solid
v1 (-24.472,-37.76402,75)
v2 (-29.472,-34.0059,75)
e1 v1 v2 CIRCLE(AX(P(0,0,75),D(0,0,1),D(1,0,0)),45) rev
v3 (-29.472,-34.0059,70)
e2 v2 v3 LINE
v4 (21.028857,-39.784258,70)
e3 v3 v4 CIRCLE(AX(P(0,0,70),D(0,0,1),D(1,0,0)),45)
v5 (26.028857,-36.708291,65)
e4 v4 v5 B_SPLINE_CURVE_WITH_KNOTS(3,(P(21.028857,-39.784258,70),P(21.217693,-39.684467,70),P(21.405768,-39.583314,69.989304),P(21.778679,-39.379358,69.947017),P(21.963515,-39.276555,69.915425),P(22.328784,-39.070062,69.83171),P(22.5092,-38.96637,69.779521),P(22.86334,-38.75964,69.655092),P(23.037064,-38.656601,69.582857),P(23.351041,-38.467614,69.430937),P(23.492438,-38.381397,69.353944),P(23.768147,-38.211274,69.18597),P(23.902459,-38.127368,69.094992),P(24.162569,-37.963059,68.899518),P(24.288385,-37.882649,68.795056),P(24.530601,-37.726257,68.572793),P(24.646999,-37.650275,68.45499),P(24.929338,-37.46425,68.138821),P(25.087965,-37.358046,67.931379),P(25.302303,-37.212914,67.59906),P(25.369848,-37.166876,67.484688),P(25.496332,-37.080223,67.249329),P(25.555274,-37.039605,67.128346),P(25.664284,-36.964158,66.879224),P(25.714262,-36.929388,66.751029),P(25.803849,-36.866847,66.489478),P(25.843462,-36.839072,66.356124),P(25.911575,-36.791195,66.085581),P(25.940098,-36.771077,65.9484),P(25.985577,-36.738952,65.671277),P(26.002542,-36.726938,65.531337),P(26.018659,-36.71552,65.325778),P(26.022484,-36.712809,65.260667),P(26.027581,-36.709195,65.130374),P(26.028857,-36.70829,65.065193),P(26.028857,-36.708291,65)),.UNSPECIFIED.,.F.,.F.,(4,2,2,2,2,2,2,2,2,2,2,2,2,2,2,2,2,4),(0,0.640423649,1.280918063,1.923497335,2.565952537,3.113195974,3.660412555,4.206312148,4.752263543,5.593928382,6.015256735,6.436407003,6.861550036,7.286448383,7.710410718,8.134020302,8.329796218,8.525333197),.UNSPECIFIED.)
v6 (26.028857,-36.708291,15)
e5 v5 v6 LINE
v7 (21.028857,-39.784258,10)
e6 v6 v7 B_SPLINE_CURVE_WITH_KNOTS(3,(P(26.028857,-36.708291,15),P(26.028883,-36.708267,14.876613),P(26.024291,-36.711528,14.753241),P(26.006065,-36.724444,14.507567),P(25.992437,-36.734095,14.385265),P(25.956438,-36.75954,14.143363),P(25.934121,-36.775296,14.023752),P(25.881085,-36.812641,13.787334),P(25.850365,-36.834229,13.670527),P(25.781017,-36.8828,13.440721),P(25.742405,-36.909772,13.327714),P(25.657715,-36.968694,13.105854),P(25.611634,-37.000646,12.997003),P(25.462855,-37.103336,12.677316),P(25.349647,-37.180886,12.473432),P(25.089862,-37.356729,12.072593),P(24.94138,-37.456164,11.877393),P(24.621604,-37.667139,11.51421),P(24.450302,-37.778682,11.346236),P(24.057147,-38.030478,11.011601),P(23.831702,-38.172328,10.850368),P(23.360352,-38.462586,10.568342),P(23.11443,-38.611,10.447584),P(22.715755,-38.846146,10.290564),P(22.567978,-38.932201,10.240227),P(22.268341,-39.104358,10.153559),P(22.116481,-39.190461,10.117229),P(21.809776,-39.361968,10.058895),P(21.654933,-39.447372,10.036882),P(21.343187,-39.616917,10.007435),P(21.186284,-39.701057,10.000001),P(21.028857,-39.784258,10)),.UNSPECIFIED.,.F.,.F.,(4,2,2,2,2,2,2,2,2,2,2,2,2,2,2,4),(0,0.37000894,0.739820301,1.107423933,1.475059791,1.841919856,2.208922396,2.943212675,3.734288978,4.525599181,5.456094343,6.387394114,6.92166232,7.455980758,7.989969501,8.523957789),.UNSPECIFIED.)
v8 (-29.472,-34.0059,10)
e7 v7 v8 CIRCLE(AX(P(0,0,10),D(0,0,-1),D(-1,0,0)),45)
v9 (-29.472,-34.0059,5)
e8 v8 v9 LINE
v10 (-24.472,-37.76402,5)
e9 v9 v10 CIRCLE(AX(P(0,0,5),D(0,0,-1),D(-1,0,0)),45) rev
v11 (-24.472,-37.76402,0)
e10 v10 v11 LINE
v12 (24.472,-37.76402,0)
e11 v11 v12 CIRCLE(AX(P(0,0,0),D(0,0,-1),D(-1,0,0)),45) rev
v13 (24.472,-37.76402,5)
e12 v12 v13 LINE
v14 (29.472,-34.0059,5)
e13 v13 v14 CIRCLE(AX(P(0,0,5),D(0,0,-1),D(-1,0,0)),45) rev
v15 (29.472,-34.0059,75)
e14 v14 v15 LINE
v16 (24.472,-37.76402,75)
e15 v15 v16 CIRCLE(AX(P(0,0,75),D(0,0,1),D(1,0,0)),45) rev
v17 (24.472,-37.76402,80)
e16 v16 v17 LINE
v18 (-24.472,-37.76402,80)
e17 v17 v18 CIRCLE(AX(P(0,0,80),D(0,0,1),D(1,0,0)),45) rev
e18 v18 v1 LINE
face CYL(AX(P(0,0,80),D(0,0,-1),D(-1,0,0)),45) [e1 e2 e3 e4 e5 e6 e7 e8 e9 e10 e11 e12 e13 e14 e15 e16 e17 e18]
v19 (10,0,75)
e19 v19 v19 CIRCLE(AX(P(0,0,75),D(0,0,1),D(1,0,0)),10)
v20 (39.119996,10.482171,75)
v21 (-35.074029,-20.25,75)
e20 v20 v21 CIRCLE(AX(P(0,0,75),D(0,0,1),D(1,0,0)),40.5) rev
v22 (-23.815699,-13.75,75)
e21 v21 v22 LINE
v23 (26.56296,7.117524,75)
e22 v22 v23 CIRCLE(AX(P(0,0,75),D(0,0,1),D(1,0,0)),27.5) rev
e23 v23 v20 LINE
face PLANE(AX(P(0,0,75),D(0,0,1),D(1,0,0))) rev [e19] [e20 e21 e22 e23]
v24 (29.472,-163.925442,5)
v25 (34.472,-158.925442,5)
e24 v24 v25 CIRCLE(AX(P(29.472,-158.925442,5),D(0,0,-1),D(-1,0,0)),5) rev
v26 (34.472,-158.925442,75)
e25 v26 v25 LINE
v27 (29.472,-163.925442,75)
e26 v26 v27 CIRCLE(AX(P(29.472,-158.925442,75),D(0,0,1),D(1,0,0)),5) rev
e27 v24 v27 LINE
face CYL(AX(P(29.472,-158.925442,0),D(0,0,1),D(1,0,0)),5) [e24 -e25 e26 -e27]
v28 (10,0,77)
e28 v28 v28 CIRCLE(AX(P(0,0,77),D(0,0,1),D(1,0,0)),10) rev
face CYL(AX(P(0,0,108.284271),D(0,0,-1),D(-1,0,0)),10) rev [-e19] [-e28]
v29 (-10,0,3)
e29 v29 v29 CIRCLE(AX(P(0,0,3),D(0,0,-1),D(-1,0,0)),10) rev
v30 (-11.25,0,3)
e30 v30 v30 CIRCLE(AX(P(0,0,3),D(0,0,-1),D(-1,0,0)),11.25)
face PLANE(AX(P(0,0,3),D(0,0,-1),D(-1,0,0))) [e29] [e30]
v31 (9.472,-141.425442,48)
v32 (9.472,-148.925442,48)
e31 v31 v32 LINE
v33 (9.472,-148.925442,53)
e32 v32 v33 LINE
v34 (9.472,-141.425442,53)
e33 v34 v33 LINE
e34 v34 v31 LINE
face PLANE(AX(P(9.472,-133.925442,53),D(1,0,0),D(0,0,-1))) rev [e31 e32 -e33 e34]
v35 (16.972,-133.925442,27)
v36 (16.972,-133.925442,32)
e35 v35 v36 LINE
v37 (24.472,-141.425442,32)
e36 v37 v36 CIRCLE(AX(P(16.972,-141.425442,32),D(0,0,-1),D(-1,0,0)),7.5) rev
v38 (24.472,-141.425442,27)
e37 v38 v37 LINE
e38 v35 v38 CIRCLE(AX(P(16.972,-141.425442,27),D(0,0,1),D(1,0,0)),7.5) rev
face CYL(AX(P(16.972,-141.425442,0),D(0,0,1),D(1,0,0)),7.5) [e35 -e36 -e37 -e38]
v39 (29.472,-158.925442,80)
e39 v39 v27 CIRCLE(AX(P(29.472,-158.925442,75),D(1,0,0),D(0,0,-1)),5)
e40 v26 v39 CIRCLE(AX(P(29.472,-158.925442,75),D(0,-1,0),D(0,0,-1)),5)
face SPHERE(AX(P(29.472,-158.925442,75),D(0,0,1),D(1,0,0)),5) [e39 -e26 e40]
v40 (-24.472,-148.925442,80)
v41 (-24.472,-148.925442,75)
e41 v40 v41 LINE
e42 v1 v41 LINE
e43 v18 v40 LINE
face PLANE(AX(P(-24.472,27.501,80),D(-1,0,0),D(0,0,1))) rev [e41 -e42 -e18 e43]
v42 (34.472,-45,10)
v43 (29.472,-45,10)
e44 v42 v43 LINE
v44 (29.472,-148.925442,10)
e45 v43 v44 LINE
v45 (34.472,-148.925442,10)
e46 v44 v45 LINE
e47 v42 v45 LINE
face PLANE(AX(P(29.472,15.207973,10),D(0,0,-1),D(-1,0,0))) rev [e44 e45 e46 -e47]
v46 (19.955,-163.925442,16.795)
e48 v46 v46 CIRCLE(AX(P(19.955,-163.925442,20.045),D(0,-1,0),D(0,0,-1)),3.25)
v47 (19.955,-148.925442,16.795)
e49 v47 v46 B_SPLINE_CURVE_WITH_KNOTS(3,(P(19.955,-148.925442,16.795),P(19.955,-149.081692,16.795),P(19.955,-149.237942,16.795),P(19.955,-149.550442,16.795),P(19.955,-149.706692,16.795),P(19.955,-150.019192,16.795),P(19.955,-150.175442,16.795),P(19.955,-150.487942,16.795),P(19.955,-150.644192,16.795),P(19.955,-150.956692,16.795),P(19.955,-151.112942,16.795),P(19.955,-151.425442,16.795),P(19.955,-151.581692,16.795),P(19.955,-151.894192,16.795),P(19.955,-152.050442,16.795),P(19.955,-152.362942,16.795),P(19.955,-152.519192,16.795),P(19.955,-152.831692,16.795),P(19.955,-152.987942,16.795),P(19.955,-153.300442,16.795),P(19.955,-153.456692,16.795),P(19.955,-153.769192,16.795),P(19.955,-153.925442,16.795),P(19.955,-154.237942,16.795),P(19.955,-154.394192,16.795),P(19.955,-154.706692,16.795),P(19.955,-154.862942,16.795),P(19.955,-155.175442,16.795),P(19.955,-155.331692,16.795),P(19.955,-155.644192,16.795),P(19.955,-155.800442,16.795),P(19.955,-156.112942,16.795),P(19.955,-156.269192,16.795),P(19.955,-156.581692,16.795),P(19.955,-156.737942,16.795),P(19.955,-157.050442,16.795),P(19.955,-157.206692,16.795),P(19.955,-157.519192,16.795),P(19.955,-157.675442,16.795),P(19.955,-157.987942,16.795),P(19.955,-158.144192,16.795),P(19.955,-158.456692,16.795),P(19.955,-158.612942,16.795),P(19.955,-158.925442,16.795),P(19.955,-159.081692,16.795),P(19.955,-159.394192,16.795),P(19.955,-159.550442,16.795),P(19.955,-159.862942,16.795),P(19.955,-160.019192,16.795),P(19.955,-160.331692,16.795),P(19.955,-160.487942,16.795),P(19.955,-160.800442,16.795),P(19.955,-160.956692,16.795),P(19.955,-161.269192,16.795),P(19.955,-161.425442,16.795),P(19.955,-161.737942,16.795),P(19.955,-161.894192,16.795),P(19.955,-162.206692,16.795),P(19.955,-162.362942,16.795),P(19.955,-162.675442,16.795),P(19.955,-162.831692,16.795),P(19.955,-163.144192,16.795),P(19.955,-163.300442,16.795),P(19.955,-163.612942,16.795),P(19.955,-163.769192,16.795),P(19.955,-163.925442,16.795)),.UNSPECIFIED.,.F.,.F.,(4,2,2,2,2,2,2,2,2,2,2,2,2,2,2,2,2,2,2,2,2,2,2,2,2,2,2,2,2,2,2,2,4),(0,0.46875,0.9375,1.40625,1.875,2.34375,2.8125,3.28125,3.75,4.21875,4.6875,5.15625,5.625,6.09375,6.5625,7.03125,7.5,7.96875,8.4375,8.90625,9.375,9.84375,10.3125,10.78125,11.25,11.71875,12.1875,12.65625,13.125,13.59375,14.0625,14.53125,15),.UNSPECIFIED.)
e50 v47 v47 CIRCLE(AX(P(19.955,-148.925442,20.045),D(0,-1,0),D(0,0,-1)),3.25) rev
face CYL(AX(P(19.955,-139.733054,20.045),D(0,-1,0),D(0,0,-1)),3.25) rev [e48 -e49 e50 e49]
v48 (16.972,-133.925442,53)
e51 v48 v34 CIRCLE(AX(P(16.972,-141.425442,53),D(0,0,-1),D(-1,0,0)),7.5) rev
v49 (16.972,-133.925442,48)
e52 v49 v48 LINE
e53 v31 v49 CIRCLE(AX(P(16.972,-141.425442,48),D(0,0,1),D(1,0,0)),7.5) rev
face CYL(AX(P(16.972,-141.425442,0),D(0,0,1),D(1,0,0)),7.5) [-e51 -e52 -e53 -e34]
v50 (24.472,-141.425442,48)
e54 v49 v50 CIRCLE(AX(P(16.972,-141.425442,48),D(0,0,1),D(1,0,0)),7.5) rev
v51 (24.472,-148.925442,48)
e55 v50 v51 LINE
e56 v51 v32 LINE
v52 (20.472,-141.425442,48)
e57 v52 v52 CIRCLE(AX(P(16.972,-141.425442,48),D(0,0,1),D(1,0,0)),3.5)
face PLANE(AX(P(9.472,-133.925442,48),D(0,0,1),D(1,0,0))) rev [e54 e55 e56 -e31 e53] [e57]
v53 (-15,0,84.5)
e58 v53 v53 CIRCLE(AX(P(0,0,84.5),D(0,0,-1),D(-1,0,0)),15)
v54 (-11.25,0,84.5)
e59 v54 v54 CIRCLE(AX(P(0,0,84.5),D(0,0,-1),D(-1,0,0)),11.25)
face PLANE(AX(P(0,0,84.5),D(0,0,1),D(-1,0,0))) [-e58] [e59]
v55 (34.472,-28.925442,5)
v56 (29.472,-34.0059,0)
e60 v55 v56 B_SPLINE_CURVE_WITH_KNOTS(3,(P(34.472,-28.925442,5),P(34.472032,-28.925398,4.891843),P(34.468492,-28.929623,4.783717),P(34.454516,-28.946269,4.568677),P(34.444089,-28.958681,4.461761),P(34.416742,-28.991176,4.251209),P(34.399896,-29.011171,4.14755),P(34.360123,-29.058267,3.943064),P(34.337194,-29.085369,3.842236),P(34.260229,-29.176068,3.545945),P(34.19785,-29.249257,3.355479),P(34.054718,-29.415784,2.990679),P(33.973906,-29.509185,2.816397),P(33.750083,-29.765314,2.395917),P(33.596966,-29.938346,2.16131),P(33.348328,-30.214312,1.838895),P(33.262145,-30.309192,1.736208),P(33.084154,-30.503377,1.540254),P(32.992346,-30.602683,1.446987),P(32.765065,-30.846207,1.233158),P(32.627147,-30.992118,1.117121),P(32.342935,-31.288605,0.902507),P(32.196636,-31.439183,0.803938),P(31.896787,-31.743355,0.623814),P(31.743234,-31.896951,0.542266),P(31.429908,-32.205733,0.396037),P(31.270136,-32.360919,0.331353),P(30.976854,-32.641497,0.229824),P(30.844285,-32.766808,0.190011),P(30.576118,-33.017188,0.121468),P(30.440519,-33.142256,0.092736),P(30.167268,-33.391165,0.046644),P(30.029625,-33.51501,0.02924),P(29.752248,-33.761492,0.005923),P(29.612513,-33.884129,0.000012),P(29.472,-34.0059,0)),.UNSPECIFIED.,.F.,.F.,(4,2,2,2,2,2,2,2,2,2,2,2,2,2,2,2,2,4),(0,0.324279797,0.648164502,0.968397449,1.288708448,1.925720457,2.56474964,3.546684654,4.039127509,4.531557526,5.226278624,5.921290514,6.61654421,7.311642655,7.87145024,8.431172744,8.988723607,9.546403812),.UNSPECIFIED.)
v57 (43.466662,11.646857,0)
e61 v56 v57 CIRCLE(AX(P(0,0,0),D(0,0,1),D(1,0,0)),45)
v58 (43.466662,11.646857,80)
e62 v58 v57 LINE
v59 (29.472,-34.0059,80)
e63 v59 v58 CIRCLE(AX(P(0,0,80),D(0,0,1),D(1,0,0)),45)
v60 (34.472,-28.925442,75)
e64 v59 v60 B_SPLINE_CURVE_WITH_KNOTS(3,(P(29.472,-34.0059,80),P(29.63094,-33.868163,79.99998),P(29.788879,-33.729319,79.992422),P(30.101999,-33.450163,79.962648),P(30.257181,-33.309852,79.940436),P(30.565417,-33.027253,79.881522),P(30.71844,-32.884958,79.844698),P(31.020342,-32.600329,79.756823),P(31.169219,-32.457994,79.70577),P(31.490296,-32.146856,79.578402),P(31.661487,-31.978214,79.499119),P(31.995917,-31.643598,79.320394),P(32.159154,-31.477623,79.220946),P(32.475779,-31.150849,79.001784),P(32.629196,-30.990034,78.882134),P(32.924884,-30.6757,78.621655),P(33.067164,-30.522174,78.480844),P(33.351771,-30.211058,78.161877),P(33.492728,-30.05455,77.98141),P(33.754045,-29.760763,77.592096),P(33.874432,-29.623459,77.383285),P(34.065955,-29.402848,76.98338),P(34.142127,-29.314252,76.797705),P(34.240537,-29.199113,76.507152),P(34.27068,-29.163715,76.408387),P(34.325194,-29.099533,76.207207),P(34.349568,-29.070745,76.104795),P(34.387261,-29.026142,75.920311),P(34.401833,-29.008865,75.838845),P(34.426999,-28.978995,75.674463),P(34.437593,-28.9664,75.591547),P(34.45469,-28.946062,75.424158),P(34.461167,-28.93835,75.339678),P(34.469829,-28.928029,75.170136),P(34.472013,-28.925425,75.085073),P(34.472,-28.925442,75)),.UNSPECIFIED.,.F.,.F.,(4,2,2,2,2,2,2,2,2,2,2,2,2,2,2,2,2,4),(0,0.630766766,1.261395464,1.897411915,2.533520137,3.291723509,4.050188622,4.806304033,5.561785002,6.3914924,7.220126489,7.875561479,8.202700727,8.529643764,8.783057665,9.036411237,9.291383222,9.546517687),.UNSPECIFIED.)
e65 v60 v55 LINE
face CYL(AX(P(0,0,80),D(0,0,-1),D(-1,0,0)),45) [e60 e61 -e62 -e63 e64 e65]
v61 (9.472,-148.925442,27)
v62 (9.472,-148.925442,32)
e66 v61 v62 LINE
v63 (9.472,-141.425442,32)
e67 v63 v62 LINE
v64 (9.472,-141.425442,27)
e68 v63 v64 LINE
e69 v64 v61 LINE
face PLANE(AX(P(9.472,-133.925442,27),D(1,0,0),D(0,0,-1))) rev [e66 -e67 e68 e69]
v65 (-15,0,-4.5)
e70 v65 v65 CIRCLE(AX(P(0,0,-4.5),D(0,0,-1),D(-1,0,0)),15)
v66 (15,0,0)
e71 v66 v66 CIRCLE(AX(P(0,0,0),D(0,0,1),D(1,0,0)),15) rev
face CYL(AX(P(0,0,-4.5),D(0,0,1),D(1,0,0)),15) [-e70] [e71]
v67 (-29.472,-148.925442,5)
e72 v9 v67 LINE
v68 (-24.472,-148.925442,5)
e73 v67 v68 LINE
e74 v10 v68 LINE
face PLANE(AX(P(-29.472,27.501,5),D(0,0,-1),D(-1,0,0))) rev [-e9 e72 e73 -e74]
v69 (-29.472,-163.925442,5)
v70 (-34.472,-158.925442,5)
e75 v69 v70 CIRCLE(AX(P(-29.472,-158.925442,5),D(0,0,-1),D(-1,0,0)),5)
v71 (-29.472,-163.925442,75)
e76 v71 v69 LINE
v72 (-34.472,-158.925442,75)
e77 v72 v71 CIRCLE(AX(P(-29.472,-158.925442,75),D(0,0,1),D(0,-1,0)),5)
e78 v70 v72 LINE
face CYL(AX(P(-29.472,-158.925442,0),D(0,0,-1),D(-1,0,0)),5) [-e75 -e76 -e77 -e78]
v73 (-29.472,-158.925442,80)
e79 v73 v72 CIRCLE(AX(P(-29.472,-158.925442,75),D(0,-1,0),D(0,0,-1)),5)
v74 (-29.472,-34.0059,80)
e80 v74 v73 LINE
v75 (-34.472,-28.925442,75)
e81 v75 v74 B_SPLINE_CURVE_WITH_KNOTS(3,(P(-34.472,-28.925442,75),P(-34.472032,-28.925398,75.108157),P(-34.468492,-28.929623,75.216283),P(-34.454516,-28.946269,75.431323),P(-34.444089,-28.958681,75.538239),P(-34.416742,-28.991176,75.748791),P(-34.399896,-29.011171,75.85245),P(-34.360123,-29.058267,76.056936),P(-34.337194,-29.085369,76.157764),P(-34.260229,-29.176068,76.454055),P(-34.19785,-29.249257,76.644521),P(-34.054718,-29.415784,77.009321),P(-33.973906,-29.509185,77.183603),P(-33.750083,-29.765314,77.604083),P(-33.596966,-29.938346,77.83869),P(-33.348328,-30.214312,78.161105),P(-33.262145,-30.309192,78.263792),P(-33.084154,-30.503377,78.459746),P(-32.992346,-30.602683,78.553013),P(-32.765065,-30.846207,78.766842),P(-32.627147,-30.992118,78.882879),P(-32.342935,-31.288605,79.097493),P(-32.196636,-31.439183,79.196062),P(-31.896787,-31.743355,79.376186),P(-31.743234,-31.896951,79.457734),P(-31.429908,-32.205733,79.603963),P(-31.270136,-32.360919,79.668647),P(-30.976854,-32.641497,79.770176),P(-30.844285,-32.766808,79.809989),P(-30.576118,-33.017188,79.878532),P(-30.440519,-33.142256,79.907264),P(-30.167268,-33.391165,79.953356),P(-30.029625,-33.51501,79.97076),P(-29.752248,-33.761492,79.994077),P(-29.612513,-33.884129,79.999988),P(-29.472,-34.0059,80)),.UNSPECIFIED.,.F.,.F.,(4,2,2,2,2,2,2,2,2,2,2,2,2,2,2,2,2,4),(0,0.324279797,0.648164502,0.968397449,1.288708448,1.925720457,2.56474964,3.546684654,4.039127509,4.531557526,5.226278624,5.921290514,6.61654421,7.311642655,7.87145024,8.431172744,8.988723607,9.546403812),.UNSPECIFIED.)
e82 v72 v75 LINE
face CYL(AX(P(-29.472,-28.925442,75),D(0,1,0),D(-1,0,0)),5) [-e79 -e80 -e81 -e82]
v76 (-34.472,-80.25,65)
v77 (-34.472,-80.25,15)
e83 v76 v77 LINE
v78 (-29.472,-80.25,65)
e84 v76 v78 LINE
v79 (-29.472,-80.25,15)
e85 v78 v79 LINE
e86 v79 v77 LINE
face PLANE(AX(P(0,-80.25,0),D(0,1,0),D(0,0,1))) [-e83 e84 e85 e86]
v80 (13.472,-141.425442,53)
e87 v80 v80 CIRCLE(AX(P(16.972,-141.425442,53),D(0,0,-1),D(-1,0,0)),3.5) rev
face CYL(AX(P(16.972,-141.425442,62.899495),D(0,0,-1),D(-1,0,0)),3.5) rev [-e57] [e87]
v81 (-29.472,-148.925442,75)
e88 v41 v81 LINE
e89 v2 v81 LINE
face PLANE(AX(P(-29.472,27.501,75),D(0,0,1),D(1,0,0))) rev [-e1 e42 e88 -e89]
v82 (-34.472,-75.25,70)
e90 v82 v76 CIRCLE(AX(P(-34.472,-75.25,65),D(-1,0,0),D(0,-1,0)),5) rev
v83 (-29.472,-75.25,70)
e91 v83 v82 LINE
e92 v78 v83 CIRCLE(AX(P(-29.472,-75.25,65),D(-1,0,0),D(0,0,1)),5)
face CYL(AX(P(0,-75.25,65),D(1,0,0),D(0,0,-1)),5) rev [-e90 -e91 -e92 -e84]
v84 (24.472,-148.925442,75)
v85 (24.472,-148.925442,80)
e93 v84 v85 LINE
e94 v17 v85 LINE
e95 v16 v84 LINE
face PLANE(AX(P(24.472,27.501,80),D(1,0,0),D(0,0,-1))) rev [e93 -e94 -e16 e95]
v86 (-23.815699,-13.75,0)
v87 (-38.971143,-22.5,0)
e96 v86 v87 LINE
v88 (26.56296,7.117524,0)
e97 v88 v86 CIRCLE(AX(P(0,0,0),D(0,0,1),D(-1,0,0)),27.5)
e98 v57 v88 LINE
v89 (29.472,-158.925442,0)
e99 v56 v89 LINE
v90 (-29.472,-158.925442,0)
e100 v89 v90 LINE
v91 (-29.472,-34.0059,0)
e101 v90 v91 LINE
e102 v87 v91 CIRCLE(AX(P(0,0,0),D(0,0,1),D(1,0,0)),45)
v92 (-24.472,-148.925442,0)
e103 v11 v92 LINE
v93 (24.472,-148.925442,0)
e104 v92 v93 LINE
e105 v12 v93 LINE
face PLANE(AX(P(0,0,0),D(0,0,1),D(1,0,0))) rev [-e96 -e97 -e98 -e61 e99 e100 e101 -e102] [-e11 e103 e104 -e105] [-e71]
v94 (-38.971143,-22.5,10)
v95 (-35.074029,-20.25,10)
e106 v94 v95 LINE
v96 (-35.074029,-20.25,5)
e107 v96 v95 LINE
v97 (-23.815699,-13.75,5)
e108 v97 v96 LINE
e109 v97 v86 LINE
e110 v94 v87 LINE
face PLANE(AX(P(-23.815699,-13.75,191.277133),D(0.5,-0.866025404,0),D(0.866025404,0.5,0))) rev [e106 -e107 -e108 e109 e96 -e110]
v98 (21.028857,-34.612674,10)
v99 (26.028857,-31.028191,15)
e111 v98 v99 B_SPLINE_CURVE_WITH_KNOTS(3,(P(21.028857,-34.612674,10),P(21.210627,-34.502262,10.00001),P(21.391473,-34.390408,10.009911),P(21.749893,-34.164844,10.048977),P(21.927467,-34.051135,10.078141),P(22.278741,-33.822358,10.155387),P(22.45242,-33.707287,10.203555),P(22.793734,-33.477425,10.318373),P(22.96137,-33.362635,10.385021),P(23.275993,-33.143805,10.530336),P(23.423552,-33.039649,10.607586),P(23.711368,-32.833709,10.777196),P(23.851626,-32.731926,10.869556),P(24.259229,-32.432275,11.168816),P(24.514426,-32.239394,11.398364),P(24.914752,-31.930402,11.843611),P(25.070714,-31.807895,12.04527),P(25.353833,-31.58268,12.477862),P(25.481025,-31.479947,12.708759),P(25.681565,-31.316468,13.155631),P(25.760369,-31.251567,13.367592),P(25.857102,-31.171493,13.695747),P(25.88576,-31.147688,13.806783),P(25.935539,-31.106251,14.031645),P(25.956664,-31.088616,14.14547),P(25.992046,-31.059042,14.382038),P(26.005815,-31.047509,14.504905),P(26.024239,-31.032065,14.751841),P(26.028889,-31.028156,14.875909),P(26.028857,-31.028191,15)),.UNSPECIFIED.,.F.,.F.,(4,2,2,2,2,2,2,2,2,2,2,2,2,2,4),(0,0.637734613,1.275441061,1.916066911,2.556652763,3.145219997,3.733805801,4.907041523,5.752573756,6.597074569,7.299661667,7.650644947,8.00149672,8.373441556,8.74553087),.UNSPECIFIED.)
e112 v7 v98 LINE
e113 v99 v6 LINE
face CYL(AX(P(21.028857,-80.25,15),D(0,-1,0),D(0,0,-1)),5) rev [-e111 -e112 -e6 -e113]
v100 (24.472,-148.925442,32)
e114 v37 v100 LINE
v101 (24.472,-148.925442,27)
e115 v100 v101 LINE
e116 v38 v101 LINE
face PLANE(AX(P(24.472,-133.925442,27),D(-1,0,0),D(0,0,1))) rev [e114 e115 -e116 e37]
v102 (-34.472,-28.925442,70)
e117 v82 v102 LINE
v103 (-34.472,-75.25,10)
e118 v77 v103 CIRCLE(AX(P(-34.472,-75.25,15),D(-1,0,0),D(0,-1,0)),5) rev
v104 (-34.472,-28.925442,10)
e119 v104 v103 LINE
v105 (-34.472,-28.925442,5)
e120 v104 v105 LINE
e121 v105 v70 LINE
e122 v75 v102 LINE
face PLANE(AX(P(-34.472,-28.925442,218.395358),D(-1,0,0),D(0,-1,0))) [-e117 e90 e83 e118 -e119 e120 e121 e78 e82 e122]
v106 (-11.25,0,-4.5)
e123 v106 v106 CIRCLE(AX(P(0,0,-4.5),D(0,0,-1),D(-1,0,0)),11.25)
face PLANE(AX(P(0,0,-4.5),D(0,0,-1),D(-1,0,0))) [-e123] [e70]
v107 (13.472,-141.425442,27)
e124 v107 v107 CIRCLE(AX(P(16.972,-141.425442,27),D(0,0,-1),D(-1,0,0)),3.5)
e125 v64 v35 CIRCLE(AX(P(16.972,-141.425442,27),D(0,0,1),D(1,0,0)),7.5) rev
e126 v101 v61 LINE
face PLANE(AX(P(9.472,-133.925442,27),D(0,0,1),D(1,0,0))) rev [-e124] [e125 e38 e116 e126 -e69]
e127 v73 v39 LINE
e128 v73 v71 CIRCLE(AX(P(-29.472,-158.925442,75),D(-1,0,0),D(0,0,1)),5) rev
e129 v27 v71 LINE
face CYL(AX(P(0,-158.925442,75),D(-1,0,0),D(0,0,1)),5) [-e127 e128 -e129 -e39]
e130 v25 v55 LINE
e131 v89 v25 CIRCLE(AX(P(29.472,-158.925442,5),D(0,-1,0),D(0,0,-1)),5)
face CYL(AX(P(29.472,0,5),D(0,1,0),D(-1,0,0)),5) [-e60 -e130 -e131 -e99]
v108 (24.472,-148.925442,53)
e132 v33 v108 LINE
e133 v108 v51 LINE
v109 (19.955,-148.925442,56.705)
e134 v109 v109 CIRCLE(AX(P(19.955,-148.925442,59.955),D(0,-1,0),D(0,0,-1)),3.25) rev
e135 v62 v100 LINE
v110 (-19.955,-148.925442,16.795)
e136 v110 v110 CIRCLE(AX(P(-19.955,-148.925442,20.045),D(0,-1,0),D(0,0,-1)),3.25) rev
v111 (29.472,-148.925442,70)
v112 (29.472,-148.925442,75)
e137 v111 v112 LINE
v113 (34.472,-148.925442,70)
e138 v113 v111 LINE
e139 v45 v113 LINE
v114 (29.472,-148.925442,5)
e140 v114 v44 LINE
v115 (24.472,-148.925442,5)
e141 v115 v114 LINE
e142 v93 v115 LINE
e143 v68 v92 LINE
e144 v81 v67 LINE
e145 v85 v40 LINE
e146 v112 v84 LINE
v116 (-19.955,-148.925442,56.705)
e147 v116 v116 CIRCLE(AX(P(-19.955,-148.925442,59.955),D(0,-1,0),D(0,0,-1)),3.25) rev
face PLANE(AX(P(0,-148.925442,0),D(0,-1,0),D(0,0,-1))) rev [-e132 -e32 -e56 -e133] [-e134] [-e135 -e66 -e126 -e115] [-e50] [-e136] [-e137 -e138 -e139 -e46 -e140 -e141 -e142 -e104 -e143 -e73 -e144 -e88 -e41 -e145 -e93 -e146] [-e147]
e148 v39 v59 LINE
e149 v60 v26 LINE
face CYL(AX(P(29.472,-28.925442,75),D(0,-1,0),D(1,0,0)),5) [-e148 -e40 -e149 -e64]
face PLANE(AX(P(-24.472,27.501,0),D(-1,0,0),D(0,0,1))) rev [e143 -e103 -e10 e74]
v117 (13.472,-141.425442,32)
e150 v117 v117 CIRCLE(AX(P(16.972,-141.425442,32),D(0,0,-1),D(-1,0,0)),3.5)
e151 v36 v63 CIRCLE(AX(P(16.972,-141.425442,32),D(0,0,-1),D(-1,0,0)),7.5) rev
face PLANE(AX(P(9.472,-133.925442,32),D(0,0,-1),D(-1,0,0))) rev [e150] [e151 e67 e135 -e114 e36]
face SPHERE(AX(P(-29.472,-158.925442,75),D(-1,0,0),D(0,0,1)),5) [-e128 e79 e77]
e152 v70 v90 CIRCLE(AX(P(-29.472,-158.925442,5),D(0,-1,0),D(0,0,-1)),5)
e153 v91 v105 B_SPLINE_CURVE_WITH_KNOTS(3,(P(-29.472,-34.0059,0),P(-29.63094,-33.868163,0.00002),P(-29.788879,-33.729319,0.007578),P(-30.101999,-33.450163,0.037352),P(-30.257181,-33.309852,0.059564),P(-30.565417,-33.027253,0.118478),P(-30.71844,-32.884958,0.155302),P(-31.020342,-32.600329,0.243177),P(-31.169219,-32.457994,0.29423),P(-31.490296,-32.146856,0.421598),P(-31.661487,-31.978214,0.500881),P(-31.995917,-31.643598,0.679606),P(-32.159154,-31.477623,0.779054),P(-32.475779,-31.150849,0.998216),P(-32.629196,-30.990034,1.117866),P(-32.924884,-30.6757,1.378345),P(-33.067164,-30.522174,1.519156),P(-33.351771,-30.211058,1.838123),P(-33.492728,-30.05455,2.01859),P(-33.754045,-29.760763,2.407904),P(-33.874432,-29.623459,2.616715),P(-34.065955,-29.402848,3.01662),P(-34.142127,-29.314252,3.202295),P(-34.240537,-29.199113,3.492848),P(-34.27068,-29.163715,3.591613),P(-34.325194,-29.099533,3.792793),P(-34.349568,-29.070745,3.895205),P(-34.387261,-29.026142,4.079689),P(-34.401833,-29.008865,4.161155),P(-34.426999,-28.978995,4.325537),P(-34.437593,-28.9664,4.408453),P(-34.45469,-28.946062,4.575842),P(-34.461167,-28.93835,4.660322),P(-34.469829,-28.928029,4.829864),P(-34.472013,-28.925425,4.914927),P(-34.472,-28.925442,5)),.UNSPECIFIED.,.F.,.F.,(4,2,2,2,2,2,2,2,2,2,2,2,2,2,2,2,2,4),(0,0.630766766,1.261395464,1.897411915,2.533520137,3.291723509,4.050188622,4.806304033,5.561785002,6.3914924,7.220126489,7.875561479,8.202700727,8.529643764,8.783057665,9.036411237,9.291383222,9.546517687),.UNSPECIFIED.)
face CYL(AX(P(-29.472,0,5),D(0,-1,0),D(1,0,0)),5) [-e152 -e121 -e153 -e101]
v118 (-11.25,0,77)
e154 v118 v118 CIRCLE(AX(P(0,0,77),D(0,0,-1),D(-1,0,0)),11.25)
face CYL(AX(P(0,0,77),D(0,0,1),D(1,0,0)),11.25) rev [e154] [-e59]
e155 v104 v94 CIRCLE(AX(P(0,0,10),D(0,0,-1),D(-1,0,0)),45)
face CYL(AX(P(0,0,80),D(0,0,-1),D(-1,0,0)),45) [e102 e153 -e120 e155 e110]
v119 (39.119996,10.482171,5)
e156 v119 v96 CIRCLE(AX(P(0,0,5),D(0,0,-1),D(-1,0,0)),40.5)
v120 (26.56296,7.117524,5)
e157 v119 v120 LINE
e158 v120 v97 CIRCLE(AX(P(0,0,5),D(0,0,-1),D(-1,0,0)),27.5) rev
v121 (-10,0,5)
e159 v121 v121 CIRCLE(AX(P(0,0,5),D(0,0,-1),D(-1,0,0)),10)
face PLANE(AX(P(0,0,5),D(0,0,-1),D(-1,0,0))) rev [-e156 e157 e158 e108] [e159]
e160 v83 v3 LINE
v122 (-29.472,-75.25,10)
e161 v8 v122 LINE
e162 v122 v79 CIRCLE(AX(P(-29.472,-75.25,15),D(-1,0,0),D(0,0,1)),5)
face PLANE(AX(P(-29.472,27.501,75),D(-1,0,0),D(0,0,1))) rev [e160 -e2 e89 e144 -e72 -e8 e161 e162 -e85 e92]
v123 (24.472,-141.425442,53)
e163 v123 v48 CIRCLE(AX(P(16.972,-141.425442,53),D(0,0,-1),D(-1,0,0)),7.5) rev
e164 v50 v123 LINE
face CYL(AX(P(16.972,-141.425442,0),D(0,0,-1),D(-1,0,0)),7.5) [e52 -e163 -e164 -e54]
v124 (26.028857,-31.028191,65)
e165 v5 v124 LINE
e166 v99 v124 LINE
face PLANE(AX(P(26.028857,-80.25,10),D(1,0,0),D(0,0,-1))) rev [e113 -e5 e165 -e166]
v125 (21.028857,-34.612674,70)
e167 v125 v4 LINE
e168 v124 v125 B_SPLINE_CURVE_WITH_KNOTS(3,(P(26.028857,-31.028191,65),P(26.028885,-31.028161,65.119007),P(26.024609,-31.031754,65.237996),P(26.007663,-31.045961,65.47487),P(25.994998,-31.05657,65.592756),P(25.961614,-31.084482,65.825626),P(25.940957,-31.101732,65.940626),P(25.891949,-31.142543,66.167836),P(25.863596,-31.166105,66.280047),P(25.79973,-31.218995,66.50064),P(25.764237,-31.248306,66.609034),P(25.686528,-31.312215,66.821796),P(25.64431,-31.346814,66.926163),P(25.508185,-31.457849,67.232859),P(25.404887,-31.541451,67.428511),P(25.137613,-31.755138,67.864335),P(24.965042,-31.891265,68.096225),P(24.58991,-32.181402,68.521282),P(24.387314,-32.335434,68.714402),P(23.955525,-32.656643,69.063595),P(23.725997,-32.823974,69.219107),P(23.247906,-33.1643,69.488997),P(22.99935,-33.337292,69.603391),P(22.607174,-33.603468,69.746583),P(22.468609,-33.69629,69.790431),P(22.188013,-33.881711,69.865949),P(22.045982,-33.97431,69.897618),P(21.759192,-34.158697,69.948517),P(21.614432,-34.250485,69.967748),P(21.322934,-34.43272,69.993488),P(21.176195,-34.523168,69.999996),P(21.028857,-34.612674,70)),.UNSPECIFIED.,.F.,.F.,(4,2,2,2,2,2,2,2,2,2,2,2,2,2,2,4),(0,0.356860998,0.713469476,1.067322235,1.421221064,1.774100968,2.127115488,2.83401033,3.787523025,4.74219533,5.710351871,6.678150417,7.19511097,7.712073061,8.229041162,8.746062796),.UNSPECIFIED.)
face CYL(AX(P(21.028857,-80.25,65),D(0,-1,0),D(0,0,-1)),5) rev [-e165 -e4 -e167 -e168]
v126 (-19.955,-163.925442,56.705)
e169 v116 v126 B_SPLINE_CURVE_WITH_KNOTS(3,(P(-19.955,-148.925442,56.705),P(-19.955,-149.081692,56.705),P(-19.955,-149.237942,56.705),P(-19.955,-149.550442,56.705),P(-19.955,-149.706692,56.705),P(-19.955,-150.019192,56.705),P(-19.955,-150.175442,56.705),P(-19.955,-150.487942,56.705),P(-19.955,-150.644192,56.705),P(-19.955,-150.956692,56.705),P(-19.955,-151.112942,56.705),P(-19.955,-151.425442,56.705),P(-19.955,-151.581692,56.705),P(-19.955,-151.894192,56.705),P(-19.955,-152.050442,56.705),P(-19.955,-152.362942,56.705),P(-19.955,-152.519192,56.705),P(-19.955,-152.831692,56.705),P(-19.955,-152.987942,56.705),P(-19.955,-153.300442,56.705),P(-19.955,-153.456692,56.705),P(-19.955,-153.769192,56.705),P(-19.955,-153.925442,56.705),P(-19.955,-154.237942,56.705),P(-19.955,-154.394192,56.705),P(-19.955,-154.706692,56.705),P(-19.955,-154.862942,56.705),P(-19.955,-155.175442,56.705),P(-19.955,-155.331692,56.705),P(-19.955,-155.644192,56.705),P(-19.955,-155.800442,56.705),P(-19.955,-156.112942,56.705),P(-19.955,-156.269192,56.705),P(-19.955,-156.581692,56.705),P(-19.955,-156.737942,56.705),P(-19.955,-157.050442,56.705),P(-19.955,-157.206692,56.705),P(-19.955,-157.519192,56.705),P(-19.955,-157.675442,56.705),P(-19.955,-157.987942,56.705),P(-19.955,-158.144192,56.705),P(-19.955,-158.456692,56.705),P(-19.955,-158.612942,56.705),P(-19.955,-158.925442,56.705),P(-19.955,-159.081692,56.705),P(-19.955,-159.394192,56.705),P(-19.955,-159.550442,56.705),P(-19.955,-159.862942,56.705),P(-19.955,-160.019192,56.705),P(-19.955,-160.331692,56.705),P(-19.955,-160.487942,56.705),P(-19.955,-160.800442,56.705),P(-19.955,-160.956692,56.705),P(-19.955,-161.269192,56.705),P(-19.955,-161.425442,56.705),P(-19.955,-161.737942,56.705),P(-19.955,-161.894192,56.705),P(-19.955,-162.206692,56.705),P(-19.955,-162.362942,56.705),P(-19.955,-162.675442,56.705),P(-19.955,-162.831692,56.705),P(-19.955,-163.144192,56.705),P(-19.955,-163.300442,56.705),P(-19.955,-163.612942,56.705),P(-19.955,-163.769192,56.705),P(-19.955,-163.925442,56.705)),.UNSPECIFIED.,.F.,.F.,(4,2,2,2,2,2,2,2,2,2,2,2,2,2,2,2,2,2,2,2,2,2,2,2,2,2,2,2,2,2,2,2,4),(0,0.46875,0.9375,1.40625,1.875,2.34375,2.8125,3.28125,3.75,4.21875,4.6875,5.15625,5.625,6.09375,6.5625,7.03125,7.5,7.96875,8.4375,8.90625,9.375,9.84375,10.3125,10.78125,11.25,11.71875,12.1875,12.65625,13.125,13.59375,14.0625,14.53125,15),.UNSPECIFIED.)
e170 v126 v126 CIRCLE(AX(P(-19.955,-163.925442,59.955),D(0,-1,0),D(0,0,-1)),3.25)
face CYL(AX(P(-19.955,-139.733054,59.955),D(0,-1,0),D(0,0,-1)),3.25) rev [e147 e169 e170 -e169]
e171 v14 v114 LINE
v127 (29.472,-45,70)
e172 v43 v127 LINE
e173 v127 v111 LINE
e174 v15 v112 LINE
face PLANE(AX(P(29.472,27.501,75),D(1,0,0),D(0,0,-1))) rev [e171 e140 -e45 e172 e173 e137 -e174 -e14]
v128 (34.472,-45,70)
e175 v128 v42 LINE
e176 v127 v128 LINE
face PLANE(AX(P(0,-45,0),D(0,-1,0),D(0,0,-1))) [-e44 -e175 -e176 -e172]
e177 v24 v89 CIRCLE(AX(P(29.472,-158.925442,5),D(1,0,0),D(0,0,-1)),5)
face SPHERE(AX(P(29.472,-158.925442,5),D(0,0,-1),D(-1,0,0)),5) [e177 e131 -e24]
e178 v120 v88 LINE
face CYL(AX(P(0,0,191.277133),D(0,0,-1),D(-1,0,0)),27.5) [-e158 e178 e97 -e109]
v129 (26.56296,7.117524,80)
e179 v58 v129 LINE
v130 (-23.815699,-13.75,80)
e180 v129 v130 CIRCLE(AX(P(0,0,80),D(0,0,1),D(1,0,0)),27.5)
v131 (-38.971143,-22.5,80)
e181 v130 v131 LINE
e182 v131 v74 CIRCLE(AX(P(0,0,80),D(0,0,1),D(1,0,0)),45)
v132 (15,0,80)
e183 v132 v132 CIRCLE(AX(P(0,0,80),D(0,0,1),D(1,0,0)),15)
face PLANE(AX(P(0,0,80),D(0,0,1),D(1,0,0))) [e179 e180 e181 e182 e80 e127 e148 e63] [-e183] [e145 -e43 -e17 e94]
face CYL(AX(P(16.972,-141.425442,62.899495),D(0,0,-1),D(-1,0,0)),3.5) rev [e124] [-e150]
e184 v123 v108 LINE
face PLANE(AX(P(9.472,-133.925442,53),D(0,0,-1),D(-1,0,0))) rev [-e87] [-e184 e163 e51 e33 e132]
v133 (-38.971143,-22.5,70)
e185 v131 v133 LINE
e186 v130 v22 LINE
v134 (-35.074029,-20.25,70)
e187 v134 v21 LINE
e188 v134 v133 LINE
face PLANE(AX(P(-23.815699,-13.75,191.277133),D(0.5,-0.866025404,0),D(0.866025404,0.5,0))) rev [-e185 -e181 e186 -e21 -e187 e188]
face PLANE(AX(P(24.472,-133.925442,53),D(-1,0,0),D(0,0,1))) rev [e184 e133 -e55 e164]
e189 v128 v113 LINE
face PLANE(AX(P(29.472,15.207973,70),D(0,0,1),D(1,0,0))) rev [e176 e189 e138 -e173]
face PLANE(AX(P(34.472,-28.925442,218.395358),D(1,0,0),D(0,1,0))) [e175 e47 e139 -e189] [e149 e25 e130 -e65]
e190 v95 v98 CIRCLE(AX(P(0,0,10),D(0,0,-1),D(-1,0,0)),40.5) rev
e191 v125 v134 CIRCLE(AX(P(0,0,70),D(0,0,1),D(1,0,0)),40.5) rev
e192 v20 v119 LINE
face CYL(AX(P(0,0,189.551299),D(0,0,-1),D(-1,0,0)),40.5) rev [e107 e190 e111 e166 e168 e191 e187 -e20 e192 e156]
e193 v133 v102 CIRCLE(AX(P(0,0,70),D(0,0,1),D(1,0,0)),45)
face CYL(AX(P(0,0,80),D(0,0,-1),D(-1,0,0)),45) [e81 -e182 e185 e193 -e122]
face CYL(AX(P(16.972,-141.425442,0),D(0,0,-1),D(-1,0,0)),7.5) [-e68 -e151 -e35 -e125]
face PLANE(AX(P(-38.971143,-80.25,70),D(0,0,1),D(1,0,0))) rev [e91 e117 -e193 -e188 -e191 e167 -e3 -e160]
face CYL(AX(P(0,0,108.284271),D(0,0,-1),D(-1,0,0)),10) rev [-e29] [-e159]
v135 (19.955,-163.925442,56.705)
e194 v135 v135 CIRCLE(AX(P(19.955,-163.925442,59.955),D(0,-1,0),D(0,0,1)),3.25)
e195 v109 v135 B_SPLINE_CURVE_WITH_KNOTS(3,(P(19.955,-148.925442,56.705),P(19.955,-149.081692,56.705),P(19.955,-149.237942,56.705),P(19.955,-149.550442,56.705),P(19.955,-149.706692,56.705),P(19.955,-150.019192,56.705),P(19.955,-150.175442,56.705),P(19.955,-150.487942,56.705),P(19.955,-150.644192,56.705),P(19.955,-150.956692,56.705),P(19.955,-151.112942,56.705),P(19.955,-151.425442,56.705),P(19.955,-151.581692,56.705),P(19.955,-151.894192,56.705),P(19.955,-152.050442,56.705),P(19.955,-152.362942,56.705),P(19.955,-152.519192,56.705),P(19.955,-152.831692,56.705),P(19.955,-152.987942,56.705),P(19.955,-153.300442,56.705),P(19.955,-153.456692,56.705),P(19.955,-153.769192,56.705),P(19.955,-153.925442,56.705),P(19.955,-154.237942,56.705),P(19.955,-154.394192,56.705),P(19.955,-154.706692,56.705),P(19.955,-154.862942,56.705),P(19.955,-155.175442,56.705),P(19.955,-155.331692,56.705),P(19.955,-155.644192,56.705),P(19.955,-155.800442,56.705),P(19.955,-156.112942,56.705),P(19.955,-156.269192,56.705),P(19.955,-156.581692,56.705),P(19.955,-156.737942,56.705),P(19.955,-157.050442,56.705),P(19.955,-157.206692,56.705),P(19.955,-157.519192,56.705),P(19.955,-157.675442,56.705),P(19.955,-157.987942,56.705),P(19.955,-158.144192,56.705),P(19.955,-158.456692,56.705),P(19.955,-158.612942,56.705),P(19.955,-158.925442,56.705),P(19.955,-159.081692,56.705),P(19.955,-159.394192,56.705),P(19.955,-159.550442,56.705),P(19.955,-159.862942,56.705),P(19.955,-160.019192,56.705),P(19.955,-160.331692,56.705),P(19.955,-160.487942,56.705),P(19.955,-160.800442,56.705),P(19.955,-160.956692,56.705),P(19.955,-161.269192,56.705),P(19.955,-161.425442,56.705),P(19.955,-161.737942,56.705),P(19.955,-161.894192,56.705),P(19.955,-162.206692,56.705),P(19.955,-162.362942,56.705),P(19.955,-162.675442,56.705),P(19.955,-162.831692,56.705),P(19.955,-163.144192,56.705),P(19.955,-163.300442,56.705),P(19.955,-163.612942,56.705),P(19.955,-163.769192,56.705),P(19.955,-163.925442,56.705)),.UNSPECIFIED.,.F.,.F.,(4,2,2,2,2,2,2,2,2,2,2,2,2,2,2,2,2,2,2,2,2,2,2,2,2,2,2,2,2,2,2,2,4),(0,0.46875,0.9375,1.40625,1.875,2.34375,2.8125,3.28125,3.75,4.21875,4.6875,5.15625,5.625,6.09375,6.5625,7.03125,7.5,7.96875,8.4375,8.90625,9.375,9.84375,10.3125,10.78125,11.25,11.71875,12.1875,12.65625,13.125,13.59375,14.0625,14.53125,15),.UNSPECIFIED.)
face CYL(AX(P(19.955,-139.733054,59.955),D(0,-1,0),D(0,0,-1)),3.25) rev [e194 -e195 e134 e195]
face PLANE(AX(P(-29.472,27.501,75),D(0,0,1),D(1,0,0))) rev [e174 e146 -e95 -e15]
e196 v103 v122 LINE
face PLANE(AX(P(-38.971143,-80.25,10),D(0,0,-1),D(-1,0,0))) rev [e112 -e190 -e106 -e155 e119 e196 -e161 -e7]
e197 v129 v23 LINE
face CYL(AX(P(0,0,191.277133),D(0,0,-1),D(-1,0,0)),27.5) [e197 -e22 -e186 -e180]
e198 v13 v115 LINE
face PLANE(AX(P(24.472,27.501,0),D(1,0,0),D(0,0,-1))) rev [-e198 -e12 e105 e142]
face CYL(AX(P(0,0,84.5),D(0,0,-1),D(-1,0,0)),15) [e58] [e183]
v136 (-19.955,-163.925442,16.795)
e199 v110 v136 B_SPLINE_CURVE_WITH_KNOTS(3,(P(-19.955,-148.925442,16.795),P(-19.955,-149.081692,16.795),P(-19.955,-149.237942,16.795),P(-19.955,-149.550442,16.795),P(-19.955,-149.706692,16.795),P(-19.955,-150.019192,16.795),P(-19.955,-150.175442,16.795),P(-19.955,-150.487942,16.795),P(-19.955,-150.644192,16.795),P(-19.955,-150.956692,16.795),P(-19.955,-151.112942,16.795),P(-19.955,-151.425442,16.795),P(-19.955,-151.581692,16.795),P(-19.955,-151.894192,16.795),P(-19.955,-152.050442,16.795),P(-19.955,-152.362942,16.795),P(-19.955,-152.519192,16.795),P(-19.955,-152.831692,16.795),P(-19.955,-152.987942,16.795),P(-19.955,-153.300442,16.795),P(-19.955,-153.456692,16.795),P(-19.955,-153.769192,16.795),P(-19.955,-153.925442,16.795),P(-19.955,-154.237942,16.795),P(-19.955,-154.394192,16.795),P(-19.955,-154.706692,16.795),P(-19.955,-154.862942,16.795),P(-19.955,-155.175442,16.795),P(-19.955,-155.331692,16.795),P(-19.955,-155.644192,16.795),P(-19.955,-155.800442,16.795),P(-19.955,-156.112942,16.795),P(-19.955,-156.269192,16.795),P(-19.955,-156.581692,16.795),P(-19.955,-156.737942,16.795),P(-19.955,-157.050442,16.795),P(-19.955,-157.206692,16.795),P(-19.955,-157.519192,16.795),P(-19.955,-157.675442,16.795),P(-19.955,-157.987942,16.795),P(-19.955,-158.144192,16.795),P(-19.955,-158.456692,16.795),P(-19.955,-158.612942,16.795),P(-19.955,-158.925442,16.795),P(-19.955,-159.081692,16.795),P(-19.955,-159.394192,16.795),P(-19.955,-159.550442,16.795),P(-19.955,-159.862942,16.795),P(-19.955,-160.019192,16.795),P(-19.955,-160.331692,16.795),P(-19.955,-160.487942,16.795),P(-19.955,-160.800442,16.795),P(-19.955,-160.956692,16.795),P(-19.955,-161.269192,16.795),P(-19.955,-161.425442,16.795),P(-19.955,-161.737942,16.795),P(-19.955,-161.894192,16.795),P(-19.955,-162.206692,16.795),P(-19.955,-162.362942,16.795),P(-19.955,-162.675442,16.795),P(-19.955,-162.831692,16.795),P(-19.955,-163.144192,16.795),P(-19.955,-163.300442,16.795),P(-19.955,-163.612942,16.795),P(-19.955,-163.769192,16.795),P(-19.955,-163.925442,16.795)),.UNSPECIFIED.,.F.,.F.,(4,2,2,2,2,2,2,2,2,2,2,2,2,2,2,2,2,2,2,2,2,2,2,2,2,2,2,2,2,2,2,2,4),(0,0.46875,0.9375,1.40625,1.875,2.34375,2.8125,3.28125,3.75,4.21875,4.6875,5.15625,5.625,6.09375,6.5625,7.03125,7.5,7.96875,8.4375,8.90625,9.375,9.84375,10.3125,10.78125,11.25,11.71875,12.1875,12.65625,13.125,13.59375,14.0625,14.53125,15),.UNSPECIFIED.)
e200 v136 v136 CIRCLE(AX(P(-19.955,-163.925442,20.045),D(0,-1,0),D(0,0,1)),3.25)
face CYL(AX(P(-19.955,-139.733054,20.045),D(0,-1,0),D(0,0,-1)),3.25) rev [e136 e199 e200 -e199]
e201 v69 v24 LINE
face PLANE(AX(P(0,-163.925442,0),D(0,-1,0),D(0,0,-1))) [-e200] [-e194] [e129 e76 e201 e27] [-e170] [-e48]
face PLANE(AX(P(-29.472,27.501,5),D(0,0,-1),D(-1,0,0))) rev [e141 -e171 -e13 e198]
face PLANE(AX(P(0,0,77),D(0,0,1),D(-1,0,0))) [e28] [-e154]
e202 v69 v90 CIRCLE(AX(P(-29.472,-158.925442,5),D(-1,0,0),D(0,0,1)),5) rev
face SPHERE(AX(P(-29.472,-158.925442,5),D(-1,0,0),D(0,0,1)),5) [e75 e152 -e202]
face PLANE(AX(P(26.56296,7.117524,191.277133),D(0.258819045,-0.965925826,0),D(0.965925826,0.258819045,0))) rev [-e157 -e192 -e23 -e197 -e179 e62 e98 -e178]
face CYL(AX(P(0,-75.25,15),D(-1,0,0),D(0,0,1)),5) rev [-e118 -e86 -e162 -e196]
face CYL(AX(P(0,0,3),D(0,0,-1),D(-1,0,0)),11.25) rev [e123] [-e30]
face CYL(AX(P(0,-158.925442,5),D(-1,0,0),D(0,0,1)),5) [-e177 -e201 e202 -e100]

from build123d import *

# Parameters (mm, degrees)
SKETCH1_R               = 45
BOSS_EXTRUDE1_DEPTH     = 80
SKETCH2_W               = 68.94399988
SKETCH2_H               = 120
BOSS_EXTRUDE2_DEPTH     = 80
CUT_EXTRUDE1_START      = -70
SKETCH3_R               = 40.5
CUT_EXTRUDE1_DEPTH      = 70
CUT_EXTRUDE2_REACH      = 176.939
SKETCH4_R               = 10
CUT_EXTRUDE3_REACH      = 176.939
CUT_EXTRUDE4_REACH      = 200.874
CUT_EXTRUDE4_END_RADIUS = 45
SKETCH6_W               = 58.94399988
SKETCH6_H               = 70
CUT_EXTRUDE5_REACH      = 200.874
CUT_EXTRUDE5_END_RADIUS = 45
SKETCH7_W               = 48.94399988
SKETCH7_H               = 5
CUT_EXTRUDE6_START      = -103.925442
SKETCH8_W               = 5
SKETCH8_H               = 60
CUT_EXTRUDE6_DEPTH      = 103.925442
SKETCH9_W               = 65
SKETCH9_H               = 60
CUT_EXTRUDE7_DEPTH      = 60
SKETCH11_W              = 68.94399988
SKETCH11_H              = 80
BOSS_EXTRUDE3_DEPTH     = 15
SKETCH12_W              = 15
SKETCH12_H              = 5
BOSS_EXTRUDE4_DEPTH     = 15
FILLET1_R               = 7.5
CUT_EXTRUDE8_REACH      = 180.061
SKETCH13_R              = 3.5
FILLET2_R               = 5
FILLET3_R               = 5
SKETCH15_R              = 15
BOSS_EXTRUDE5_DEPTH     = 4.5
SKETCH16_R              = 11.25
CUT_EXTRUDE9_DEPTH      = 7.5
SKETCH17_R              = 3.25
CUT_EXTRUDE10_DEPTH     = 15


with BuildPart() as part:
    # Sketch1 → Boss-Extrude1 (new body)
    with BuildSketch(Plane.XY):
        Circle(SKETCH1_R)
    extrude(amount=BOSS_EXTRUDE1_DEPTH)

    # Sketch2 → Boss-Extrude2 (add)
    with BuildSketch(Plane(origin=(0, 0, 0), x_dir=(-1, 0, 0), z_dir=(0, 0, -1))):
        with Locations((0, -88.925442436)):
            Rectangle(SKETCH2_W, SKETCH2_H)
    extrude(amount=-BOSS_EXTRUDE2_DEPTH)

    # Sketch3 → Cut-Extrude1 (cut)
    with BuildSketch(Plane(origin=(0, 0, 5), x_dir=(-1, 0, 0), z_dir=(0, 0, -1)).offset(CUT_EXTRUDE1_START)):
        Circle(SKETCH3_R)
    extrude(amount=CUT_EXTRUDE1_DEPTH, mode=Mode.SUBTRACT)

    # Cut-Extrude2: up to this face of the body (flat: up to its plane)
    cut_extrude2_end = Plane(part.part.faces().sort_by_distance((0, -51.092470511, 80))[0])
    # Sketch4 → Cut-Extrude2 (cut, up to the picked face)
    with BuildSketch(Plane(origin=(0, 0, 0), x_dir=(-1, 0, 0), z_dir=(0, 0, -1)), mode=Mode.PRIVATE) as cut_extrude2_sk1:
        Circle(SKETCH4_R)
    cut_extrude2_tool1 = split(extrude(cut_extrude2_sk1.sketch, amount=-CUT_EXTRUDE2_REACH, mode=Mode.PRIVATE), bisect_by=cut_extrude2_end, keep=Keep.BOTH, mode=Mode.PRIVATE)
    add(cut_extrude2_tool1.solids().sort_by(Axis((0, 0, 0), (0, 0, 1)))[0], mode=Mode.SUBTRACT)

    # Cut-Extrude3: up to this face of the body (flat: up to its plane)
    cut_extrude3_end = Plane(part.part.faces().sort_by_distance((0, -52.276987432, 80))[0])
    # Sketch5 → Cut-Extrude3 (cut, up to the picked face)
    with BuildSketch(Plane(origin=(0, 0, 0), x_dir=(-1, 0, 0), z_dir=(0, 0, -1)), mode=Mode.PRIVATE) as cut_extrude3_sk1:
        with BuildLine():
            Line((-26.562960223, 7.11752374), (-43.466662183, 11.64685703))
            ThreePointArc((-43.466662183, 11.64685703), (17.220754456, 41.574578963), (38.97114317, -22.5))
            Line((38.97114317, -22.5), (23.815698604, -13.75))
            ThreePointArc((23.815698604, -13.75), (10.52379439, 25.406687144), (-26.562960223, 7.11752374))
        make_face()
    cut_extrude3_tool1 = split(extrude(cut_extrude3_sk1.sketch, amount=-CUT_EXTRUDE3_REACH, mode=Mode.PRIVATE), bisect_by=cut_extrude3_end, keep=Keep.BOTH, mode=Mode.PRIVATE)
    add(cut_extrude3_tool1.solids().sort_by(Axis((-31.949807, -17.161312, 0), (0, 0, 1)))[0], mode=Mode.SUBTRACT)

    # Cut-Extrude4: up to this cylinder (the profile starts outside it)
    cut_extrude4_end = Plane(origin=(0, 0, 40), z_dir=(0, 0, -1)) * Cylinder(CUT_EXTRUDE4_END_RADIUS, 492.748, mode=Mode.PRIVATE)
    # Sketch6 → Cut-Extrude4 (cut, up to the surface)
    with BuildSketch(Plane.XZ.offset(148.925442436), mode=Mode.PRIVATE) as cut_extrude4_sk1:
        with Locations((0, 40)):
            Rectangle(SKETCH6_W, SKETCH6_H)
    cut_extrude4_tool1 = extrude(cut_extrude4_sk1.sketch, amount=-CUT_EXTRUDE4_REACH, mode=Mode.PRIVATE) - cut_extrude4_end
    add(cut_extrude4_tool1.solids().sort_by_distance((0, -148.925442, 40))[0], mode=Mode.SUBTRACT)

    # Cut-Extrude5: up to this cylinder (the profile starts outside it)
    cut_extrude5_end = Plane(origin=(0, 0, 40), z_dir=(0, 0, -1)) * Cylinder(CUT_EXTRUDE5_END_RADIUS, 567.748, mode=Mode.PRIVATE)
    # Sketch7 → Cut-Extrude5 (cut, up to the surface)
    with BuildSketch(Plane.XZ.offset(148.925442436), mode=Mode.PRIVATE) as cut_extrude5_sk1:
        with Locations((0, 77.5)):
            Rectangle(SKETCH7_W, SKETCH7_H)
    cut_extrude5_tool1 = extrude(cut_extrude5_sk1.sketch, amount=-CUT_EXTRUDE5_REACH, mode=Mode.PRIVATE) - cut_extrude5_end
    add(cut_extrude5_tool1.solids().sort_by_distance((0, -148.925442, 77.5))[0], mode=Mode.SUBTRACT)
    # Sketch7 → Cut-Extrude5 (cut, up to the surface)
    with BuildSketch(Plane.XZ.offset(148.925442436), mode=Mode.PRIVATE) as cut_extrude5_sk2:
        with Locations((0, 2.5)):
            Rectangle(SKETCH7_W, SKETCH7_H)
    cut_extrude5_tool2 = extrude(cut_extrude5_sk2.sketch, amount=-CUT_EXTRUDE5_REACH, mode=Mode.PRIVATE) - cut_extrude5_end
    add(cut_extrude5_tool2.solids().sort_by_distance((0, -148.925442, 2.5))[0], mode=Mode.SUBTRACT)

    # Sketch8 → Cut-Extrude6 (cut)
    with BuildSketch(Plane.XZ.offset(148.925442436).offset(CUT_EXTRUDE6_START)):
        with Locations((31.97199994, 40)):
            Rectangle(SKETCH8_W, SKETCH8_H)
    extrude(amount=CUT_EXTRUDE6_DEPTH, mode=Mode.SUBTRACT)

    # Sketch9 → Cut-Extrude7 (cut)
    with BuildSketch(Plane(origin=(0, -20.25, 0), x_dir=(1, 0, 0), z_dir=(0, 1, 0))):
        with Locations((-6.47114317, -40)):
            Rectangle(SKETCH9_W, SKETCH9_H)
    extrude(amount=-CUT_EXTRUDE7_DEPTH, mode=Mode.SUBTRACT)

    # Sketch11 → Boss-Extrude3 (add)
    with BuildSketch(Plane.XZ.offset(148.925442436)):
        with Locations((0, 40)):
            Rectangle(SKETCH11_W, SKETCH11_H)
    extrude(amount=BOSS_EXTRUDE3_DEPTH)

    # Sketch12 → Boss-Extrude4 (add)
    with BuildSketch(Plane(origin=(0, -148.925442436, 0), x_dir=(1, 0, 0), z_dir=(0, 1, 0))):
        with Locations((16.97199994, -29.5)):
            Rectangle(SKETCH12_W, SKETCH12_H)
        with Locations((16.97199994, -50.5)):
            Rectangle(SKETCH12_W, SKETCH12_H)
    extrude(amount=BOSS_EXTRUDE4_DEPTH)

    # Fillet1
    fillet1_edges = [part.edges().sort_by_distance(p)[0] for p in [
        (24.47199994, -133.925442436, 50.5),
        (9.47199994, -133.925442436, 50.5),
        (24.47199994, -133.925442436, 29.5),
        (9.47199994, -133.925442436, 29.5),
    ]]
    fillet(fillet1_edges, radius=FILLET1_R - 0.0001)  # a hair under: the kernel refuses the full size

    # Cut-Extrude8: up to this face of the body (flat: up to its plane)
    cut_extrude8_end = Plane(part.part.faces().sort_by_distance((16.97199994, -142.125548149, 53))[0])
    # Sketch13 → Cut-Extrude8 (cut, up to the picked face)
    with BuildSketch(Plane(origin=(0, 0, 27), x_dir=(-1, 0, 0), z_dir=(0, 0, -1)), mode=Mode.PRIVATE) as cut_extrude8_sk1:
        with Locations((-16.97199994, -141.425442436)):
            Circle(SKETCH13_R)
    cut_extrude8_tool1 = split(extrude(cut_extrude8_sk1.sketch, amount=-CUT_EXTRUDE8_REACH, mode=Mode.PRIVATE), bisect_by=cut_extrude8_end, keep=Keep.BOTH, mode=Mode.PRIVATE)
    add(cut_extrude8_tool1.solids().sort_by(Axis((16.972, -141.425442, 27), (0, 0, 1)))[0], mode=Mode.SUBTRACT)

    # Fillet2
    fillet2_edges = [part.edges().sort_by_distance(p)[0] for p in [
        (34.47199994, -96.425442436, 0),
        (-34.47199994, -96.425442436, 0),
        (34.47199994, -96.425442436, 80),
        (-34.47199994, -96.425442436, 80),
        (-34.47199994, -163.925442436, 40),
        (0, -163.925442436, 0),
        (34.47199994, -163.925442436, 40),
        (0, -163.925442436, 80),
    ]]
    fillet(fillet2_edges, radius=FILLET2_R)

    # Fillet3
    fillet3_edges = [part.edges().sort_by_distance(p)[0] for p in [
        (26.02885683, -33.868240693, 10),
        (-31.97199994, -80.25, 10),
        (-31.97199994, -80.25, 70),
        (26.02885683, -33.868240693, 70),
    ]]
    fillet(fillet3_edges, radius=FILLET3_R)

    # Sketch15 → Boss-Extrude5 (add)
    with BuildSketch(Plane(origin=(0, 0, 0), x_dir=(-1, 0, 0), z_dir=(0, 0, -1))):
        with Locations(Location((0, 0, 0), (0, 0, 180))):
            Circle(SKETCH15_R)
    boss_extrude5 = extrude(amount=BOSS_EXTRUDE5_DEPTH)

    # Mirror1: Boss-Extrude5 across plane
    add(boss_extrude5.mirror(Plane.XY.offset(40)))

    # Sketch16 → Cut-Extrude9 (cut)
    with BuildSketch(Plane(origin=(0, 0, -4.5), x_dir=(-1, 0, 0), z_dir=(0, 0, -1))):
        Circle(SKETCH16_R)
    cut_extrude9 = extrude(amount=-CUT_EXTRUDE9_DEPTH, mode=Mode.SUBTRACT)

    # Mirror2: Cut-Extrude9 across plane
    add(cut_extrude9.mirror(Plane.XY.offset(40)), mode=Mode.SUBTRACT)

    # Sketch17 → Cut-Extrude10 (cut)
    with BuildSketch(Plane.XZ.offset(163.925442436)):
        with Locations(Location((-19.955, 59.955, 0), (0, 0, 270))):
            Circle(SKETCH17_R)
        with Locations(Location((19.955, 59.955, 0), (0, 0, 270))):
            Circle(SKETCH17_R)
        with Locations(Location((19.955, 20.045, 0), (0, 0, 270))):
            Circle(SKETCH17_R)
        with Locations(Location((-19.955, 20.045, 0), (0, 0, 270))):
            Circle(SKETCH17_R)
    extrude(amount=-CUT_EXTRUDE10_DEPTH, mode=Mode.SUBTRACT)


solid = part.part
